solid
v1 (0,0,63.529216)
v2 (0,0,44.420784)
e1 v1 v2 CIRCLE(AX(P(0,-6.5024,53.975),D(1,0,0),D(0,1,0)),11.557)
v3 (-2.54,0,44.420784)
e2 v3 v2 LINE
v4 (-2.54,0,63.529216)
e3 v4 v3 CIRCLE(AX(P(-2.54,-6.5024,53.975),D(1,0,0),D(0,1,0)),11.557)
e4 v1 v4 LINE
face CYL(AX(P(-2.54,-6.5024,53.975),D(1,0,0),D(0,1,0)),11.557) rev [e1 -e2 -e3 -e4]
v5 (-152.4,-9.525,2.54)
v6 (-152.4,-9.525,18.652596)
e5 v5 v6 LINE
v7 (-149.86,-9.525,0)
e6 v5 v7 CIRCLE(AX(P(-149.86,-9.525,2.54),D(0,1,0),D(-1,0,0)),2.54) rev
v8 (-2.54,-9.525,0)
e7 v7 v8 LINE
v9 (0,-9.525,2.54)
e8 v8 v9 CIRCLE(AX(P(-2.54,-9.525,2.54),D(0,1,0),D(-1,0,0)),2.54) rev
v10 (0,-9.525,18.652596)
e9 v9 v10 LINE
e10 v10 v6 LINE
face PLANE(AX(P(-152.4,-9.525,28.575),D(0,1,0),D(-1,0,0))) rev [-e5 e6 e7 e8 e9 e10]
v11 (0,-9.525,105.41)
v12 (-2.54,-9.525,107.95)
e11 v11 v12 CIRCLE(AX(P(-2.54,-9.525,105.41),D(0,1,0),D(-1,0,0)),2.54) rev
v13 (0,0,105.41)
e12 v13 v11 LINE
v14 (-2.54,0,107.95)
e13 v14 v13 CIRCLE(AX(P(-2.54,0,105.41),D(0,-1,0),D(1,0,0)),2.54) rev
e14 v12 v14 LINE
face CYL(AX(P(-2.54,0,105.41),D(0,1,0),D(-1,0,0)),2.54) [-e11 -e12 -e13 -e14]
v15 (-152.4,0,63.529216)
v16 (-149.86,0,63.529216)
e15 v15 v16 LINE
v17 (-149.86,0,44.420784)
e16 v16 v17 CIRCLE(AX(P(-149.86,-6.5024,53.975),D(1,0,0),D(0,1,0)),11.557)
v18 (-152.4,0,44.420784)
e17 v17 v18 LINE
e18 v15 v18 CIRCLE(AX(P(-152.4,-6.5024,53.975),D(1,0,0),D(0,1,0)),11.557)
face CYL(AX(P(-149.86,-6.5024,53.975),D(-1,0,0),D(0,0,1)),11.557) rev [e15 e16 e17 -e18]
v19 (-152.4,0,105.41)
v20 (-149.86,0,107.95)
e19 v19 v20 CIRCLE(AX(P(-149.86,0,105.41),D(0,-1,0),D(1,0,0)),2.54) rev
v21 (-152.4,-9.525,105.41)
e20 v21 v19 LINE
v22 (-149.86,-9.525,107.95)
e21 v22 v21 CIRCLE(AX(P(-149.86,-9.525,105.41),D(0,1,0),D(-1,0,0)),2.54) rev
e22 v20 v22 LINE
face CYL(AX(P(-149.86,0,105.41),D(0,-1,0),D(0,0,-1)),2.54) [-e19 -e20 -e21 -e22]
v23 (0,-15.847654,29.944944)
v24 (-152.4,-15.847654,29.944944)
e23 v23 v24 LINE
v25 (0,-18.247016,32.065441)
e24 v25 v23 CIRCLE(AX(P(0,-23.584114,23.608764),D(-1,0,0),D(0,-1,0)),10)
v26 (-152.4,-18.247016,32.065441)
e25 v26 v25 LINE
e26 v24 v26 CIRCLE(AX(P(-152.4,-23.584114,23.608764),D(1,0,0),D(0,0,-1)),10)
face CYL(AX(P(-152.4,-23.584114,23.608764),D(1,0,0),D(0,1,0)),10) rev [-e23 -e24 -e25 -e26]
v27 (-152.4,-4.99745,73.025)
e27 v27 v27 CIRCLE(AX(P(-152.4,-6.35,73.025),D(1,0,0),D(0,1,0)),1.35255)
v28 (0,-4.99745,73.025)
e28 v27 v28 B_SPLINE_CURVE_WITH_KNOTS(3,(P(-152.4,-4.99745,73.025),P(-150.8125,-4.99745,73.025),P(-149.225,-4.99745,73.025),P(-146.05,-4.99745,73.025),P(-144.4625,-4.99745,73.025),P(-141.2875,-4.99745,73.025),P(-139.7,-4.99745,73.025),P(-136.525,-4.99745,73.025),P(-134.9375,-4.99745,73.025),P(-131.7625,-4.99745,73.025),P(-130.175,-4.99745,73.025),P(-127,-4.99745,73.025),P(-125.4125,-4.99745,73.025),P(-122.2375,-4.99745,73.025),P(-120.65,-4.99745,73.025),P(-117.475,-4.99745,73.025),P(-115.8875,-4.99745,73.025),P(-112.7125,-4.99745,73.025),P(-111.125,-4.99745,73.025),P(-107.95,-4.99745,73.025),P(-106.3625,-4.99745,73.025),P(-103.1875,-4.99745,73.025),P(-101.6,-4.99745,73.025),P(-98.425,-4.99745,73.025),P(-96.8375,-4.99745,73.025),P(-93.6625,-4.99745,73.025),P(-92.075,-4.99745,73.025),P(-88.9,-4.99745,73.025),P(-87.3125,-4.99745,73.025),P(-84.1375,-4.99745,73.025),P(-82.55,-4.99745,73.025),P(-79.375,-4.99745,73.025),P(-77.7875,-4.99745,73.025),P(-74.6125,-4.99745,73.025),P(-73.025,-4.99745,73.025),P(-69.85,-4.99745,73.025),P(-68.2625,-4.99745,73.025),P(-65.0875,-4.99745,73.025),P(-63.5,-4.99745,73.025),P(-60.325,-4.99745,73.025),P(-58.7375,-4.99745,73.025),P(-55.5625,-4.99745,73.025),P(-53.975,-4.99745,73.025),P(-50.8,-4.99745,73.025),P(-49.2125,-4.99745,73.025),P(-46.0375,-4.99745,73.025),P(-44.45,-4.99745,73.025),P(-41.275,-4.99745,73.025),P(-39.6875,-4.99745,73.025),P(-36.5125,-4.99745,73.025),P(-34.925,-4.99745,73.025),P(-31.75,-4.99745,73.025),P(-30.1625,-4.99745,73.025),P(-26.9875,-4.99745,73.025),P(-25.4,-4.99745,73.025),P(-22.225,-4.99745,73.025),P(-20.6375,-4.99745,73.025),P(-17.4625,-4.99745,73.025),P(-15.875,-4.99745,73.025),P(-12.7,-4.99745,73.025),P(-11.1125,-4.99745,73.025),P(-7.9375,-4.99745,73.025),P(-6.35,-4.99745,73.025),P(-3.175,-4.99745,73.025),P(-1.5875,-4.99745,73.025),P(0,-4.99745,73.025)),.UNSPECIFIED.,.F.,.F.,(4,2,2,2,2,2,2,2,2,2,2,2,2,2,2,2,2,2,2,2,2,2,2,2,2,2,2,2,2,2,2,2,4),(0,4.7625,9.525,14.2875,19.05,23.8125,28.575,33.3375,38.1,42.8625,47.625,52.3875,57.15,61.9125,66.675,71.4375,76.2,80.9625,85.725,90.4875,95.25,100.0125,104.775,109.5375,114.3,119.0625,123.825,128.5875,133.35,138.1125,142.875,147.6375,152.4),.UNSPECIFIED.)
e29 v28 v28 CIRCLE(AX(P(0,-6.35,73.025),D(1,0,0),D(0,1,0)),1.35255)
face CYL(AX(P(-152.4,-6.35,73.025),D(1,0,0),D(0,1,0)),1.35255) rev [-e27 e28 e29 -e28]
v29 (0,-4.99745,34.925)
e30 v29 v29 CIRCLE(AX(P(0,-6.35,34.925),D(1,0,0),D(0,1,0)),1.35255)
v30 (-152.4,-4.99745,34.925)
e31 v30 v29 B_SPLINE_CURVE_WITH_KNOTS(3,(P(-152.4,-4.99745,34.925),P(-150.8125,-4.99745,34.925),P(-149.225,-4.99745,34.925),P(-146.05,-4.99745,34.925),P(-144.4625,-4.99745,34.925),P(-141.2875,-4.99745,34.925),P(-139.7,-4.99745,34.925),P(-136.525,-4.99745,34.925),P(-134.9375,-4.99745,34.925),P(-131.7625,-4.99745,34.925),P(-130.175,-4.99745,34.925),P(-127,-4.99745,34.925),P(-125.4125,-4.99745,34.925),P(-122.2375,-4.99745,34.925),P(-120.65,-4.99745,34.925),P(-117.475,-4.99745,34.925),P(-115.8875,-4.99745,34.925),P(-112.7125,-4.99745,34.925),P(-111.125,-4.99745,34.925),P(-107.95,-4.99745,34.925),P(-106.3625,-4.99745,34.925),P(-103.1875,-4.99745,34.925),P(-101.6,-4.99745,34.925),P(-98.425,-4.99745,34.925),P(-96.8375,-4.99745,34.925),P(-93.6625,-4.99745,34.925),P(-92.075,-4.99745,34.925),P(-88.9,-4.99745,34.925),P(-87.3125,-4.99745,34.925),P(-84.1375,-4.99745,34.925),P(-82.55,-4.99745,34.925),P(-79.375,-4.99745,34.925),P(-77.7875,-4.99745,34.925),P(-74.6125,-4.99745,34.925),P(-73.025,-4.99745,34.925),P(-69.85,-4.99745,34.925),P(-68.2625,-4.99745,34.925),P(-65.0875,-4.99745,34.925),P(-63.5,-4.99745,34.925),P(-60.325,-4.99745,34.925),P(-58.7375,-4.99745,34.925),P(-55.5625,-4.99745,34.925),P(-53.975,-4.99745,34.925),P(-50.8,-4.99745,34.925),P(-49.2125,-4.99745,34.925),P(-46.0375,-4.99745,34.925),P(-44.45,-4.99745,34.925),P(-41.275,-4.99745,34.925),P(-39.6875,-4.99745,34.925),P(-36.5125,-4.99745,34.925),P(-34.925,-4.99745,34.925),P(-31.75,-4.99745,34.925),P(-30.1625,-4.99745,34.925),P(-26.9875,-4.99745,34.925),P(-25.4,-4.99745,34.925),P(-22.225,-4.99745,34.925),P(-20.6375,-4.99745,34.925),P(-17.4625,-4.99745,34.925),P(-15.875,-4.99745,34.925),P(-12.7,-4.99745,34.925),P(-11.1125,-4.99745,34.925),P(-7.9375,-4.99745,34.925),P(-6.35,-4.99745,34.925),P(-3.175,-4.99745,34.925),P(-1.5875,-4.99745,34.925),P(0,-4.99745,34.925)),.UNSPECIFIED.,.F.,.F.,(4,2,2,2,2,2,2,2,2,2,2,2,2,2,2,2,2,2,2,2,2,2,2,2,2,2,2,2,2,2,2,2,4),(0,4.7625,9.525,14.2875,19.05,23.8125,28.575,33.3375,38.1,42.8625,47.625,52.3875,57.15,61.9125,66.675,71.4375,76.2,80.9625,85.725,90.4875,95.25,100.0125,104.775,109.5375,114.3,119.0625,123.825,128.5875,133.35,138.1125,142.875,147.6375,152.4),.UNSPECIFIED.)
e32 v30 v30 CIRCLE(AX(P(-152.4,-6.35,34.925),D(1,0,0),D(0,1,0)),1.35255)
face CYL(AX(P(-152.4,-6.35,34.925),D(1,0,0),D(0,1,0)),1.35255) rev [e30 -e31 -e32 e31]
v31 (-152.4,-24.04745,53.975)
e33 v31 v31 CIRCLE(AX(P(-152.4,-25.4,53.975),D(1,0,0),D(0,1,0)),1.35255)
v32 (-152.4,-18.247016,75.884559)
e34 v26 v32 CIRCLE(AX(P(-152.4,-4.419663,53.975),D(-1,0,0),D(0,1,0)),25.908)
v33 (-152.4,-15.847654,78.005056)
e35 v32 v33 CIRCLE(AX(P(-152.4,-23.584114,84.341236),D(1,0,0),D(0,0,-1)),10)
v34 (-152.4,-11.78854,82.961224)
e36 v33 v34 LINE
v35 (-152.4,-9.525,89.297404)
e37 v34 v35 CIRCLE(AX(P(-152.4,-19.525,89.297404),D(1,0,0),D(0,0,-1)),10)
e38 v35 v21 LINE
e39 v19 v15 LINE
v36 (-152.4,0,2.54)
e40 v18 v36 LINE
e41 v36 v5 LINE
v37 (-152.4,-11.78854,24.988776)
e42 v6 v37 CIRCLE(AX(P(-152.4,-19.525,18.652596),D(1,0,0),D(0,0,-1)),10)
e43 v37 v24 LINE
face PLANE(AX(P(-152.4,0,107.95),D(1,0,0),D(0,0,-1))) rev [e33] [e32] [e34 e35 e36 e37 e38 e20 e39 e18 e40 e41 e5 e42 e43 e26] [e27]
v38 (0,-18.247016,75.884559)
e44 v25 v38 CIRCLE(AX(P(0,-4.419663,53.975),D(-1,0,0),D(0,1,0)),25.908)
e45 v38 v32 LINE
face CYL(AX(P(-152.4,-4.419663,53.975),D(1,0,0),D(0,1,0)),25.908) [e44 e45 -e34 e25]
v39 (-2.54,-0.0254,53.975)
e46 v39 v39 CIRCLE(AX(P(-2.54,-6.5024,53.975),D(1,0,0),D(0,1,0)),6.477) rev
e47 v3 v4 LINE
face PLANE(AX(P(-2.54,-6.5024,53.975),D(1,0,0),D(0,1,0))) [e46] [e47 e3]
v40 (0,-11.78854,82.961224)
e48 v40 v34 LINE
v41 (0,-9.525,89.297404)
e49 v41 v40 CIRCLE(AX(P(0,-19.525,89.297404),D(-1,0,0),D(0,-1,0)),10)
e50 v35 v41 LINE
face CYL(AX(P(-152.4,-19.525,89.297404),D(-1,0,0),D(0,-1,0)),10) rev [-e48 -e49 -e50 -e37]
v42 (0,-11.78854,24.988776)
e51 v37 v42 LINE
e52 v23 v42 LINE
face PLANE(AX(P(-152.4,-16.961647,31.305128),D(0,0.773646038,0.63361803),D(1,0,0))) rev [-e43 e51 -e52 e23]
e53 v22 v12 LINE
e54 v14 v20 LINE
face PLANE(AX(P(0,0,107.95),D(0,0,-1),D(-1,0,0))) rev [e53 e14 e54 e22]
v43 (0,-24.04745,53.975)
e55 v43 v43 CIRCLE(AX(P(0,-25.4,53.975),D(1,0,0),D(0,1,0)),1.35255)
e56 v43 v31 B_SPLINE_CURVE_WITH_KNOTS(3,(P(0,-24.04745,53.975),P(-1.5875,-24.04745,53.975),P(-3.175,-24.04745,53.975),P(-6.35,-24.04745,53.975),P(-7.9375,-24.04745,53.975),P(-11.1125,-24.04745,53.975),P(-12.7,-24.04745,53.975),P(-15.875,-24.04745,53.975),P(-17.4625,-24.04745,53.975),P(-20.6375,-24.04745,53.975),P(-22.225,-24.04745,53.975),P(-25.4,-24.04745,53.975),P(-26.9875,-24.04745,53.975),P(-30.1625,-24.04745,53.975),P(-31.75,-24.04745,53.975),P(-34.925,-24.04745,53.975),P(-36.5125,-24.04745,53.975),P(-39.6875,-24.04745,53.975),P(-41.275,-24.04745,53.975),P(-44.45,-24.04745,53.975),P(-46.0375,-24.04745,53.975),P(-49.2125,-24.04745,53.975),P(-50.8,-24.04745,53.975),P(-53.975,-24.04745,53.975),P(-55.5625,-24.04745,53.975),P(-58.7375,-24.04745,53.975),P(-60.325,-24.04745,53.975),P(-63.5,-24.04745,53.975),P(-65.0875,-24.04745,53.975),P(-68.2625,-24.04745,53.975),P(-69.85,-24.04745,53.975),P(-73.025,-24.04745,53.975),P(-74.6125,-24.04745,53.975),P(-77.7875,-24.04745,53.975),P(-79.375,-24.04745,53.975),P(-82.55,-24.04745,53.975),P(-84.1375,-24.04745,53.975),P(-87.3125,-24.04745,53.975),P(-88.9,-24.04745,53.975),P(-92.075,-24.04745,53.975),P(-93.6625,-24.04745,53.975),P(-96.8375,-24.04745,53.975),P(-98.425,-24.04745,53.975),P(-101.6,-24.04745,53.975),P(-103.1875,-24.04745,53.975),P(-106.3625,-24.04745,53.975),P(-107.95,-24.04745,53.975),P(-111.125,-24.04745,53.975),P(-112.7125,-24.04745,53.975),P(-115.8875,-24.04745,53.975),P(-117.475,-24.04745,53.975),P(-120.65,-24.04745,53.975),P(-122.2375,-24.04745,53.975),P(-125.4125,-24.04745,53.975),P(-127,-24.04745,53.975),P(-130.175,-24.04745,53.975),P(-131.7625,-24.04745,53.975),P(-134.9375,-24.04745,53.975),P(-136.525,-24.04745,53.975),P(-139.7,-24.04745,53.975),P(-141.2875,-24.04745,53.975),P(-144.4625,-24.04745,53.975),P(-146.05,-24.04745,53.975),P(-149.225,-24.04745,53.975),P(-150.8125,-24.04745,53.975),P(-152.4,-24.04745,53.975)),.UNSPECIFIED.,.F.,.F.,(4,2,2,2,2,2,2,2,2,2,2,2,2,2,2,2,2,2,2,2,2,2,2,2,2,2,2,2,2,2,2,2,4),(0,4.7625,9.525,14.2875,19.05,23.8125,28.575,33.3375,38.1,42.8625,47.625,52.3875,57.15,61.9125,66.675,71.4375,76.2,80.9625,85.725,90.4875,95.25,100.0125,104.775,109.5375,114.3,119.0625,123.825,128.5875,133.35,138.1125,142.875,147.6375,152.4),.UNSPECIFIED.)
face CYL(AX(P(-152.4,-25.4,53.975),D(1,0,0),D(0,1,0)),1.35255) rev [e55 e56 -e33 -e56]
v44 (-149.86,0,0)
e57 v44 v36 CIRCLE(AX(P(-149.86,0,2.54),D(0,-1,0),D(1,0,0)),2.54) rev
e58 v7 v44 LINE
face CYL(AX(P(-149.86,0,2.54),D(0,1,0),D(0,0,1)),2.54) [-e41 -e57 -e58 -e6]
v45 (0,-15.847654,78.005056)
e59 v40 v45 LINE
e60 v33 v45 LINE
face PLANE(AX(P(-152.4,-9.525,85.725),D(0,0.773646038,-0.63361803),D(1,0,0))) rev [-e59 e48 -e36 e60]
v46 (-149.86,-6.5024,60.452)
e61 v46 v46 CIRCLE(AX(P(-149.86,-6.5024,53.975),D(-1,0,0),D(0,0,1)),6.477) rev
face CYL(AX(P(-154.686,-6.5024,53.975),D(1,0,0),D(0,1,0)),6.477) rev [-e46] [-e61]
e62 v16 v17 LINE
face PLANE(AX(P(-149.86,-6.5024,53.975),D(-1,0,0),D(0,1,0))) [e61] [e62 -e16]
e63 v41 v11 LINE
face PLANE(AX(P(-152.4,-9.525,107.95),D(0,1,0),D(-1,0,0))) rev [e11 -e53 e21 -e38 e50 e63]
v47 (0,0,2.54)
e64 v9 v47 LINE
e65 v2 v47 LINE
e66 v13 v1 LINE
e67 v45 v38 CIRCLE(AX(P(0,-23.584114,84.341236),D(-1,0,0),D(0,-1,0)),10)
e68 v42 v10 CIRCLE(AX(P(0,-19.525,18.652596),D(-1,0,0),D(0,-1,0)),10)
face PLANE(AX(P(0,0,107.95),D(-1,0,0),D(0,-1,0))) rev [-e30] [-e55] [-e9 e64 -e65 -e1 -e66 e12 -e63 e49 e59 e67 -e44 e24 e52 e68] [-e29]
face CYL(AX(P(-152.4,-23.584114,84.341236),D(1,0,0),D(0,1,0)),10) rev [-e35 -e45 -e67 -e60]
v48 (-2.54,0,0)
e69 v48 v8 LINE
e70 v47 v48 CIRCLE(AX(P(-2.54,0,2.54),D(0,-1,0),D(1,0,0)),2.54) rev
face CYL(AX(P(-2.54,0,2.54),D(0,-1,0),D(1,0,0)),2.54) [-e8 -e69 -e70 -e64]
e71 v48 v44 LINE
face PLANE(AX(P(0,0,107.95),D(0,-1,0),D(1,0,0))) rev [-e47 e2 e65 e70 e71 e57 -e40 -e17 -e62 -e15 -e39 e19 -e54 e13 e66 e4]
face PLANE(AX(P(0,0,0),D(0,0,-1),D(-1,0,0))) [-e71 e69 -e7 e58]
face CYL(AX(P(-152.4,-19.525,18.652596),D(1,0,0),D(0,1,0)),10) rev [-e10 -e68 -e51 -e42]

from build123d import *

# Parameters (mm, degrees)
SKETCH1_W           = 152.4
SKETCH1_H           = 38.1
BOSS_EXTRUDE1_DEPTH = 107.95
SKETCH2_R           = 1.35255
CUT_EXTRUDE1_DEPTH  = 152.4
SKETCH3_R           = 6.477
CUT_EXTRUDE4_DEPTH  = 154.686
SKETCH4_R           = 11.557
CUT_EXTRUDE5_DEPTH  = 2.54
CUT_EXTRUDE6_DEPTH  = 152.4
CHAMFER1_SIZE       = 6.35
FILLET1_R           = 10
FILLET2_R           = 2.54


with BuildPart() as part:
    # Sketch1 → Boss-Extrude1 (new body)
    with BuildSketch(Plane.XY):
        with Locations((-76.2, -19.05)):
            Rectangle(SKETCH1_W, SKETCH1_H)
    extrude(amount=BOSS_EXTRUDE1_DEPTH)

    # Sketch2 → Cut-Extrude1 (cut)
    with BuildSketch(Plane(origin=(0, 0, 0), x_dir=(0, 0, -1), z_dir=(1, 0, 0))):
        with Locations(Location((-73.025, -6.35, 0), (0, 0, 90))):
            Circle(SKETCH2_R)
        with BuildLine():
            ThreePointArc((-52.62245, -25.4), (-53.018602723, -24.443602723), (-53.975, -24.04745))
            Line((-53.975, -24.04745), (-53.975, -26.75255))
            ThreePointArc((-53.975, -26.75255), (-53.018602723, -26.356397277), (-52.62245, -25.4))
        make_face()
        with BuildLine():
            Line((-53.975, -26.75255), (-53.975, -24.04745))
            ThreePointArc((-53.975, -24.04745), (-55.32755, -25.4), (-53.975, -26.75255))
        make_face()
        with Locations(Location((-34.925, -6.35, 0), (0, 0, 90))):
            Circle(SKETCH2_R)
    extrude(amount=-CUT_EXTRUDE1_DEPTH, mode=Mode.SUBTRACT)

    # Sketch3 → Cut-Extrude4 (cut)
    with BuildSketch(Plane(origin=(0, 0, 0), x_dir=(0, 0, -1), z_dir=(1, 0, 0))):
        with Locations(Location((-53.975, -6.5024, 0), (0, 0, 90))):
            Circle(SKETCH3_R)
    extrude(amount=-CUT_EXTRUDE4_DEPTH, mode=Mode.SUBTRACT)

    # Sketch4 → Cut-Extrude5 (cut)
    with BuildSketch(Plane(origin=(0, 0, 0), x_dir=(0, 0, -1), z_dir=(1, 0, 0))):
        with Locations((-53.975, -6.5024)):
            Circle(SKETCH4_R)
    cut_extrude5 = extrude(amount=-CUT_EXTRUDE5_DEPTH, mode=Mode.SUBTRACT)

    # Mirror1: Cut-Extrude5 across plane
    add(cut_extrude5.mirror(Plane(origin=(-76.2, 0, 0), x_dir=(0, 0, 1), z_dir=(1, 0, 0))), mode=Mode.SUBTRACT)

    # Sketch5 → Cut-Extrude6 (cut)
    with BuildSketch(Plane(origin=(0, 0, 0), x_dir=(0, 0, -1), z_dir=(1, 0, 0))):
        with BuildLine():
            Line((-107.95, -9.525), (-79.375, -9.525))
            ThreePointArc((-79.375, -9.525), (-53.975, -30.327663184), (-28.575, -9.525))
            Line((-28.575, -9.525), (0, -9.525))
            Line((0, -9.525), (0, -59.754484856))
            Line((0, -59.754484856), (-107.95, -59.754484856))
            Line((-107.95, -59.754484856), (-107.95, -9.525))
        make_face()
    extrude(amount=-CUT_EXTRUDE6_DEPTH, mode=Mode.SUBTRACT)

    # Chamfer1
    # the kernel refuses this chamfer: 6.35 mm, written as the material it adds along each edge
    with BuildSketch(Plane(origin=(0, -9.525, 79.375), x_dir=(0, -0.9387392646709182, -0.34462819525555927), z_dir=(-1, 0, 0))) as chamfer1_piece_1:
        with BuildLine():
            Line((7.921952063, 0), (-CHAMFER1_SIZE * 0.344628195256, CHAMFER1_SIZE * 0.938739264671))
            Line((-CHAMFER1_SIZE * 0.344628195256, CHAMFER1_SIZE * 0.938739264671), (0, 0))
            ThreePointArc((0, 0), (4.071956682, 0.304341963), (7.921952063, 0))
        make_face()
    extrude(amount=152.4)
    with BuildSketch(Plane(origin=(0, -9.525, 28.575), x_dir=(0, 0, -1), z_dir=(-1, 0, 0))) as chamfer1_piece_2:
        with BuildLine():
            Line((CHAMFER1_SIZE, 0), (-2.730128042, 7.436647454))
            ThreePointArc((-2.730128042, 7.436647454), (-1.117613332, 3.927390442), (0, 0))
            Line((0, 0), (CHAMFER1_SIZE, 0))
        make_face()
    extrude(amount=152.4)

    # Fillet1
    fillet1_edges = [part.edges().sort_by_distance(p)[0] for p in [
        (-76.2, -9.525, 85.725),
        (-76.2, -16.961647454, 31.305128042),
        (-76.2, -16.961647454, 76.644871958),
        (-76.2, -9.525, 22.225),
    ]]
    fillet(fillet1_edges, radius=FILLET1_R)

    # Fillet2
    fillet2_edges = [part.edges().sort_by_distance(p)[0] for p in [
        (-152.4, -4.7625, 107.95),
        (-152.4, -4.7625, 0),
        (0, -4.7625, 0),
        (0, -4.7625, 107.95),
    ]]
    fillet(fillet2_edges, radius=FILLET2_R)


solid = part.part
